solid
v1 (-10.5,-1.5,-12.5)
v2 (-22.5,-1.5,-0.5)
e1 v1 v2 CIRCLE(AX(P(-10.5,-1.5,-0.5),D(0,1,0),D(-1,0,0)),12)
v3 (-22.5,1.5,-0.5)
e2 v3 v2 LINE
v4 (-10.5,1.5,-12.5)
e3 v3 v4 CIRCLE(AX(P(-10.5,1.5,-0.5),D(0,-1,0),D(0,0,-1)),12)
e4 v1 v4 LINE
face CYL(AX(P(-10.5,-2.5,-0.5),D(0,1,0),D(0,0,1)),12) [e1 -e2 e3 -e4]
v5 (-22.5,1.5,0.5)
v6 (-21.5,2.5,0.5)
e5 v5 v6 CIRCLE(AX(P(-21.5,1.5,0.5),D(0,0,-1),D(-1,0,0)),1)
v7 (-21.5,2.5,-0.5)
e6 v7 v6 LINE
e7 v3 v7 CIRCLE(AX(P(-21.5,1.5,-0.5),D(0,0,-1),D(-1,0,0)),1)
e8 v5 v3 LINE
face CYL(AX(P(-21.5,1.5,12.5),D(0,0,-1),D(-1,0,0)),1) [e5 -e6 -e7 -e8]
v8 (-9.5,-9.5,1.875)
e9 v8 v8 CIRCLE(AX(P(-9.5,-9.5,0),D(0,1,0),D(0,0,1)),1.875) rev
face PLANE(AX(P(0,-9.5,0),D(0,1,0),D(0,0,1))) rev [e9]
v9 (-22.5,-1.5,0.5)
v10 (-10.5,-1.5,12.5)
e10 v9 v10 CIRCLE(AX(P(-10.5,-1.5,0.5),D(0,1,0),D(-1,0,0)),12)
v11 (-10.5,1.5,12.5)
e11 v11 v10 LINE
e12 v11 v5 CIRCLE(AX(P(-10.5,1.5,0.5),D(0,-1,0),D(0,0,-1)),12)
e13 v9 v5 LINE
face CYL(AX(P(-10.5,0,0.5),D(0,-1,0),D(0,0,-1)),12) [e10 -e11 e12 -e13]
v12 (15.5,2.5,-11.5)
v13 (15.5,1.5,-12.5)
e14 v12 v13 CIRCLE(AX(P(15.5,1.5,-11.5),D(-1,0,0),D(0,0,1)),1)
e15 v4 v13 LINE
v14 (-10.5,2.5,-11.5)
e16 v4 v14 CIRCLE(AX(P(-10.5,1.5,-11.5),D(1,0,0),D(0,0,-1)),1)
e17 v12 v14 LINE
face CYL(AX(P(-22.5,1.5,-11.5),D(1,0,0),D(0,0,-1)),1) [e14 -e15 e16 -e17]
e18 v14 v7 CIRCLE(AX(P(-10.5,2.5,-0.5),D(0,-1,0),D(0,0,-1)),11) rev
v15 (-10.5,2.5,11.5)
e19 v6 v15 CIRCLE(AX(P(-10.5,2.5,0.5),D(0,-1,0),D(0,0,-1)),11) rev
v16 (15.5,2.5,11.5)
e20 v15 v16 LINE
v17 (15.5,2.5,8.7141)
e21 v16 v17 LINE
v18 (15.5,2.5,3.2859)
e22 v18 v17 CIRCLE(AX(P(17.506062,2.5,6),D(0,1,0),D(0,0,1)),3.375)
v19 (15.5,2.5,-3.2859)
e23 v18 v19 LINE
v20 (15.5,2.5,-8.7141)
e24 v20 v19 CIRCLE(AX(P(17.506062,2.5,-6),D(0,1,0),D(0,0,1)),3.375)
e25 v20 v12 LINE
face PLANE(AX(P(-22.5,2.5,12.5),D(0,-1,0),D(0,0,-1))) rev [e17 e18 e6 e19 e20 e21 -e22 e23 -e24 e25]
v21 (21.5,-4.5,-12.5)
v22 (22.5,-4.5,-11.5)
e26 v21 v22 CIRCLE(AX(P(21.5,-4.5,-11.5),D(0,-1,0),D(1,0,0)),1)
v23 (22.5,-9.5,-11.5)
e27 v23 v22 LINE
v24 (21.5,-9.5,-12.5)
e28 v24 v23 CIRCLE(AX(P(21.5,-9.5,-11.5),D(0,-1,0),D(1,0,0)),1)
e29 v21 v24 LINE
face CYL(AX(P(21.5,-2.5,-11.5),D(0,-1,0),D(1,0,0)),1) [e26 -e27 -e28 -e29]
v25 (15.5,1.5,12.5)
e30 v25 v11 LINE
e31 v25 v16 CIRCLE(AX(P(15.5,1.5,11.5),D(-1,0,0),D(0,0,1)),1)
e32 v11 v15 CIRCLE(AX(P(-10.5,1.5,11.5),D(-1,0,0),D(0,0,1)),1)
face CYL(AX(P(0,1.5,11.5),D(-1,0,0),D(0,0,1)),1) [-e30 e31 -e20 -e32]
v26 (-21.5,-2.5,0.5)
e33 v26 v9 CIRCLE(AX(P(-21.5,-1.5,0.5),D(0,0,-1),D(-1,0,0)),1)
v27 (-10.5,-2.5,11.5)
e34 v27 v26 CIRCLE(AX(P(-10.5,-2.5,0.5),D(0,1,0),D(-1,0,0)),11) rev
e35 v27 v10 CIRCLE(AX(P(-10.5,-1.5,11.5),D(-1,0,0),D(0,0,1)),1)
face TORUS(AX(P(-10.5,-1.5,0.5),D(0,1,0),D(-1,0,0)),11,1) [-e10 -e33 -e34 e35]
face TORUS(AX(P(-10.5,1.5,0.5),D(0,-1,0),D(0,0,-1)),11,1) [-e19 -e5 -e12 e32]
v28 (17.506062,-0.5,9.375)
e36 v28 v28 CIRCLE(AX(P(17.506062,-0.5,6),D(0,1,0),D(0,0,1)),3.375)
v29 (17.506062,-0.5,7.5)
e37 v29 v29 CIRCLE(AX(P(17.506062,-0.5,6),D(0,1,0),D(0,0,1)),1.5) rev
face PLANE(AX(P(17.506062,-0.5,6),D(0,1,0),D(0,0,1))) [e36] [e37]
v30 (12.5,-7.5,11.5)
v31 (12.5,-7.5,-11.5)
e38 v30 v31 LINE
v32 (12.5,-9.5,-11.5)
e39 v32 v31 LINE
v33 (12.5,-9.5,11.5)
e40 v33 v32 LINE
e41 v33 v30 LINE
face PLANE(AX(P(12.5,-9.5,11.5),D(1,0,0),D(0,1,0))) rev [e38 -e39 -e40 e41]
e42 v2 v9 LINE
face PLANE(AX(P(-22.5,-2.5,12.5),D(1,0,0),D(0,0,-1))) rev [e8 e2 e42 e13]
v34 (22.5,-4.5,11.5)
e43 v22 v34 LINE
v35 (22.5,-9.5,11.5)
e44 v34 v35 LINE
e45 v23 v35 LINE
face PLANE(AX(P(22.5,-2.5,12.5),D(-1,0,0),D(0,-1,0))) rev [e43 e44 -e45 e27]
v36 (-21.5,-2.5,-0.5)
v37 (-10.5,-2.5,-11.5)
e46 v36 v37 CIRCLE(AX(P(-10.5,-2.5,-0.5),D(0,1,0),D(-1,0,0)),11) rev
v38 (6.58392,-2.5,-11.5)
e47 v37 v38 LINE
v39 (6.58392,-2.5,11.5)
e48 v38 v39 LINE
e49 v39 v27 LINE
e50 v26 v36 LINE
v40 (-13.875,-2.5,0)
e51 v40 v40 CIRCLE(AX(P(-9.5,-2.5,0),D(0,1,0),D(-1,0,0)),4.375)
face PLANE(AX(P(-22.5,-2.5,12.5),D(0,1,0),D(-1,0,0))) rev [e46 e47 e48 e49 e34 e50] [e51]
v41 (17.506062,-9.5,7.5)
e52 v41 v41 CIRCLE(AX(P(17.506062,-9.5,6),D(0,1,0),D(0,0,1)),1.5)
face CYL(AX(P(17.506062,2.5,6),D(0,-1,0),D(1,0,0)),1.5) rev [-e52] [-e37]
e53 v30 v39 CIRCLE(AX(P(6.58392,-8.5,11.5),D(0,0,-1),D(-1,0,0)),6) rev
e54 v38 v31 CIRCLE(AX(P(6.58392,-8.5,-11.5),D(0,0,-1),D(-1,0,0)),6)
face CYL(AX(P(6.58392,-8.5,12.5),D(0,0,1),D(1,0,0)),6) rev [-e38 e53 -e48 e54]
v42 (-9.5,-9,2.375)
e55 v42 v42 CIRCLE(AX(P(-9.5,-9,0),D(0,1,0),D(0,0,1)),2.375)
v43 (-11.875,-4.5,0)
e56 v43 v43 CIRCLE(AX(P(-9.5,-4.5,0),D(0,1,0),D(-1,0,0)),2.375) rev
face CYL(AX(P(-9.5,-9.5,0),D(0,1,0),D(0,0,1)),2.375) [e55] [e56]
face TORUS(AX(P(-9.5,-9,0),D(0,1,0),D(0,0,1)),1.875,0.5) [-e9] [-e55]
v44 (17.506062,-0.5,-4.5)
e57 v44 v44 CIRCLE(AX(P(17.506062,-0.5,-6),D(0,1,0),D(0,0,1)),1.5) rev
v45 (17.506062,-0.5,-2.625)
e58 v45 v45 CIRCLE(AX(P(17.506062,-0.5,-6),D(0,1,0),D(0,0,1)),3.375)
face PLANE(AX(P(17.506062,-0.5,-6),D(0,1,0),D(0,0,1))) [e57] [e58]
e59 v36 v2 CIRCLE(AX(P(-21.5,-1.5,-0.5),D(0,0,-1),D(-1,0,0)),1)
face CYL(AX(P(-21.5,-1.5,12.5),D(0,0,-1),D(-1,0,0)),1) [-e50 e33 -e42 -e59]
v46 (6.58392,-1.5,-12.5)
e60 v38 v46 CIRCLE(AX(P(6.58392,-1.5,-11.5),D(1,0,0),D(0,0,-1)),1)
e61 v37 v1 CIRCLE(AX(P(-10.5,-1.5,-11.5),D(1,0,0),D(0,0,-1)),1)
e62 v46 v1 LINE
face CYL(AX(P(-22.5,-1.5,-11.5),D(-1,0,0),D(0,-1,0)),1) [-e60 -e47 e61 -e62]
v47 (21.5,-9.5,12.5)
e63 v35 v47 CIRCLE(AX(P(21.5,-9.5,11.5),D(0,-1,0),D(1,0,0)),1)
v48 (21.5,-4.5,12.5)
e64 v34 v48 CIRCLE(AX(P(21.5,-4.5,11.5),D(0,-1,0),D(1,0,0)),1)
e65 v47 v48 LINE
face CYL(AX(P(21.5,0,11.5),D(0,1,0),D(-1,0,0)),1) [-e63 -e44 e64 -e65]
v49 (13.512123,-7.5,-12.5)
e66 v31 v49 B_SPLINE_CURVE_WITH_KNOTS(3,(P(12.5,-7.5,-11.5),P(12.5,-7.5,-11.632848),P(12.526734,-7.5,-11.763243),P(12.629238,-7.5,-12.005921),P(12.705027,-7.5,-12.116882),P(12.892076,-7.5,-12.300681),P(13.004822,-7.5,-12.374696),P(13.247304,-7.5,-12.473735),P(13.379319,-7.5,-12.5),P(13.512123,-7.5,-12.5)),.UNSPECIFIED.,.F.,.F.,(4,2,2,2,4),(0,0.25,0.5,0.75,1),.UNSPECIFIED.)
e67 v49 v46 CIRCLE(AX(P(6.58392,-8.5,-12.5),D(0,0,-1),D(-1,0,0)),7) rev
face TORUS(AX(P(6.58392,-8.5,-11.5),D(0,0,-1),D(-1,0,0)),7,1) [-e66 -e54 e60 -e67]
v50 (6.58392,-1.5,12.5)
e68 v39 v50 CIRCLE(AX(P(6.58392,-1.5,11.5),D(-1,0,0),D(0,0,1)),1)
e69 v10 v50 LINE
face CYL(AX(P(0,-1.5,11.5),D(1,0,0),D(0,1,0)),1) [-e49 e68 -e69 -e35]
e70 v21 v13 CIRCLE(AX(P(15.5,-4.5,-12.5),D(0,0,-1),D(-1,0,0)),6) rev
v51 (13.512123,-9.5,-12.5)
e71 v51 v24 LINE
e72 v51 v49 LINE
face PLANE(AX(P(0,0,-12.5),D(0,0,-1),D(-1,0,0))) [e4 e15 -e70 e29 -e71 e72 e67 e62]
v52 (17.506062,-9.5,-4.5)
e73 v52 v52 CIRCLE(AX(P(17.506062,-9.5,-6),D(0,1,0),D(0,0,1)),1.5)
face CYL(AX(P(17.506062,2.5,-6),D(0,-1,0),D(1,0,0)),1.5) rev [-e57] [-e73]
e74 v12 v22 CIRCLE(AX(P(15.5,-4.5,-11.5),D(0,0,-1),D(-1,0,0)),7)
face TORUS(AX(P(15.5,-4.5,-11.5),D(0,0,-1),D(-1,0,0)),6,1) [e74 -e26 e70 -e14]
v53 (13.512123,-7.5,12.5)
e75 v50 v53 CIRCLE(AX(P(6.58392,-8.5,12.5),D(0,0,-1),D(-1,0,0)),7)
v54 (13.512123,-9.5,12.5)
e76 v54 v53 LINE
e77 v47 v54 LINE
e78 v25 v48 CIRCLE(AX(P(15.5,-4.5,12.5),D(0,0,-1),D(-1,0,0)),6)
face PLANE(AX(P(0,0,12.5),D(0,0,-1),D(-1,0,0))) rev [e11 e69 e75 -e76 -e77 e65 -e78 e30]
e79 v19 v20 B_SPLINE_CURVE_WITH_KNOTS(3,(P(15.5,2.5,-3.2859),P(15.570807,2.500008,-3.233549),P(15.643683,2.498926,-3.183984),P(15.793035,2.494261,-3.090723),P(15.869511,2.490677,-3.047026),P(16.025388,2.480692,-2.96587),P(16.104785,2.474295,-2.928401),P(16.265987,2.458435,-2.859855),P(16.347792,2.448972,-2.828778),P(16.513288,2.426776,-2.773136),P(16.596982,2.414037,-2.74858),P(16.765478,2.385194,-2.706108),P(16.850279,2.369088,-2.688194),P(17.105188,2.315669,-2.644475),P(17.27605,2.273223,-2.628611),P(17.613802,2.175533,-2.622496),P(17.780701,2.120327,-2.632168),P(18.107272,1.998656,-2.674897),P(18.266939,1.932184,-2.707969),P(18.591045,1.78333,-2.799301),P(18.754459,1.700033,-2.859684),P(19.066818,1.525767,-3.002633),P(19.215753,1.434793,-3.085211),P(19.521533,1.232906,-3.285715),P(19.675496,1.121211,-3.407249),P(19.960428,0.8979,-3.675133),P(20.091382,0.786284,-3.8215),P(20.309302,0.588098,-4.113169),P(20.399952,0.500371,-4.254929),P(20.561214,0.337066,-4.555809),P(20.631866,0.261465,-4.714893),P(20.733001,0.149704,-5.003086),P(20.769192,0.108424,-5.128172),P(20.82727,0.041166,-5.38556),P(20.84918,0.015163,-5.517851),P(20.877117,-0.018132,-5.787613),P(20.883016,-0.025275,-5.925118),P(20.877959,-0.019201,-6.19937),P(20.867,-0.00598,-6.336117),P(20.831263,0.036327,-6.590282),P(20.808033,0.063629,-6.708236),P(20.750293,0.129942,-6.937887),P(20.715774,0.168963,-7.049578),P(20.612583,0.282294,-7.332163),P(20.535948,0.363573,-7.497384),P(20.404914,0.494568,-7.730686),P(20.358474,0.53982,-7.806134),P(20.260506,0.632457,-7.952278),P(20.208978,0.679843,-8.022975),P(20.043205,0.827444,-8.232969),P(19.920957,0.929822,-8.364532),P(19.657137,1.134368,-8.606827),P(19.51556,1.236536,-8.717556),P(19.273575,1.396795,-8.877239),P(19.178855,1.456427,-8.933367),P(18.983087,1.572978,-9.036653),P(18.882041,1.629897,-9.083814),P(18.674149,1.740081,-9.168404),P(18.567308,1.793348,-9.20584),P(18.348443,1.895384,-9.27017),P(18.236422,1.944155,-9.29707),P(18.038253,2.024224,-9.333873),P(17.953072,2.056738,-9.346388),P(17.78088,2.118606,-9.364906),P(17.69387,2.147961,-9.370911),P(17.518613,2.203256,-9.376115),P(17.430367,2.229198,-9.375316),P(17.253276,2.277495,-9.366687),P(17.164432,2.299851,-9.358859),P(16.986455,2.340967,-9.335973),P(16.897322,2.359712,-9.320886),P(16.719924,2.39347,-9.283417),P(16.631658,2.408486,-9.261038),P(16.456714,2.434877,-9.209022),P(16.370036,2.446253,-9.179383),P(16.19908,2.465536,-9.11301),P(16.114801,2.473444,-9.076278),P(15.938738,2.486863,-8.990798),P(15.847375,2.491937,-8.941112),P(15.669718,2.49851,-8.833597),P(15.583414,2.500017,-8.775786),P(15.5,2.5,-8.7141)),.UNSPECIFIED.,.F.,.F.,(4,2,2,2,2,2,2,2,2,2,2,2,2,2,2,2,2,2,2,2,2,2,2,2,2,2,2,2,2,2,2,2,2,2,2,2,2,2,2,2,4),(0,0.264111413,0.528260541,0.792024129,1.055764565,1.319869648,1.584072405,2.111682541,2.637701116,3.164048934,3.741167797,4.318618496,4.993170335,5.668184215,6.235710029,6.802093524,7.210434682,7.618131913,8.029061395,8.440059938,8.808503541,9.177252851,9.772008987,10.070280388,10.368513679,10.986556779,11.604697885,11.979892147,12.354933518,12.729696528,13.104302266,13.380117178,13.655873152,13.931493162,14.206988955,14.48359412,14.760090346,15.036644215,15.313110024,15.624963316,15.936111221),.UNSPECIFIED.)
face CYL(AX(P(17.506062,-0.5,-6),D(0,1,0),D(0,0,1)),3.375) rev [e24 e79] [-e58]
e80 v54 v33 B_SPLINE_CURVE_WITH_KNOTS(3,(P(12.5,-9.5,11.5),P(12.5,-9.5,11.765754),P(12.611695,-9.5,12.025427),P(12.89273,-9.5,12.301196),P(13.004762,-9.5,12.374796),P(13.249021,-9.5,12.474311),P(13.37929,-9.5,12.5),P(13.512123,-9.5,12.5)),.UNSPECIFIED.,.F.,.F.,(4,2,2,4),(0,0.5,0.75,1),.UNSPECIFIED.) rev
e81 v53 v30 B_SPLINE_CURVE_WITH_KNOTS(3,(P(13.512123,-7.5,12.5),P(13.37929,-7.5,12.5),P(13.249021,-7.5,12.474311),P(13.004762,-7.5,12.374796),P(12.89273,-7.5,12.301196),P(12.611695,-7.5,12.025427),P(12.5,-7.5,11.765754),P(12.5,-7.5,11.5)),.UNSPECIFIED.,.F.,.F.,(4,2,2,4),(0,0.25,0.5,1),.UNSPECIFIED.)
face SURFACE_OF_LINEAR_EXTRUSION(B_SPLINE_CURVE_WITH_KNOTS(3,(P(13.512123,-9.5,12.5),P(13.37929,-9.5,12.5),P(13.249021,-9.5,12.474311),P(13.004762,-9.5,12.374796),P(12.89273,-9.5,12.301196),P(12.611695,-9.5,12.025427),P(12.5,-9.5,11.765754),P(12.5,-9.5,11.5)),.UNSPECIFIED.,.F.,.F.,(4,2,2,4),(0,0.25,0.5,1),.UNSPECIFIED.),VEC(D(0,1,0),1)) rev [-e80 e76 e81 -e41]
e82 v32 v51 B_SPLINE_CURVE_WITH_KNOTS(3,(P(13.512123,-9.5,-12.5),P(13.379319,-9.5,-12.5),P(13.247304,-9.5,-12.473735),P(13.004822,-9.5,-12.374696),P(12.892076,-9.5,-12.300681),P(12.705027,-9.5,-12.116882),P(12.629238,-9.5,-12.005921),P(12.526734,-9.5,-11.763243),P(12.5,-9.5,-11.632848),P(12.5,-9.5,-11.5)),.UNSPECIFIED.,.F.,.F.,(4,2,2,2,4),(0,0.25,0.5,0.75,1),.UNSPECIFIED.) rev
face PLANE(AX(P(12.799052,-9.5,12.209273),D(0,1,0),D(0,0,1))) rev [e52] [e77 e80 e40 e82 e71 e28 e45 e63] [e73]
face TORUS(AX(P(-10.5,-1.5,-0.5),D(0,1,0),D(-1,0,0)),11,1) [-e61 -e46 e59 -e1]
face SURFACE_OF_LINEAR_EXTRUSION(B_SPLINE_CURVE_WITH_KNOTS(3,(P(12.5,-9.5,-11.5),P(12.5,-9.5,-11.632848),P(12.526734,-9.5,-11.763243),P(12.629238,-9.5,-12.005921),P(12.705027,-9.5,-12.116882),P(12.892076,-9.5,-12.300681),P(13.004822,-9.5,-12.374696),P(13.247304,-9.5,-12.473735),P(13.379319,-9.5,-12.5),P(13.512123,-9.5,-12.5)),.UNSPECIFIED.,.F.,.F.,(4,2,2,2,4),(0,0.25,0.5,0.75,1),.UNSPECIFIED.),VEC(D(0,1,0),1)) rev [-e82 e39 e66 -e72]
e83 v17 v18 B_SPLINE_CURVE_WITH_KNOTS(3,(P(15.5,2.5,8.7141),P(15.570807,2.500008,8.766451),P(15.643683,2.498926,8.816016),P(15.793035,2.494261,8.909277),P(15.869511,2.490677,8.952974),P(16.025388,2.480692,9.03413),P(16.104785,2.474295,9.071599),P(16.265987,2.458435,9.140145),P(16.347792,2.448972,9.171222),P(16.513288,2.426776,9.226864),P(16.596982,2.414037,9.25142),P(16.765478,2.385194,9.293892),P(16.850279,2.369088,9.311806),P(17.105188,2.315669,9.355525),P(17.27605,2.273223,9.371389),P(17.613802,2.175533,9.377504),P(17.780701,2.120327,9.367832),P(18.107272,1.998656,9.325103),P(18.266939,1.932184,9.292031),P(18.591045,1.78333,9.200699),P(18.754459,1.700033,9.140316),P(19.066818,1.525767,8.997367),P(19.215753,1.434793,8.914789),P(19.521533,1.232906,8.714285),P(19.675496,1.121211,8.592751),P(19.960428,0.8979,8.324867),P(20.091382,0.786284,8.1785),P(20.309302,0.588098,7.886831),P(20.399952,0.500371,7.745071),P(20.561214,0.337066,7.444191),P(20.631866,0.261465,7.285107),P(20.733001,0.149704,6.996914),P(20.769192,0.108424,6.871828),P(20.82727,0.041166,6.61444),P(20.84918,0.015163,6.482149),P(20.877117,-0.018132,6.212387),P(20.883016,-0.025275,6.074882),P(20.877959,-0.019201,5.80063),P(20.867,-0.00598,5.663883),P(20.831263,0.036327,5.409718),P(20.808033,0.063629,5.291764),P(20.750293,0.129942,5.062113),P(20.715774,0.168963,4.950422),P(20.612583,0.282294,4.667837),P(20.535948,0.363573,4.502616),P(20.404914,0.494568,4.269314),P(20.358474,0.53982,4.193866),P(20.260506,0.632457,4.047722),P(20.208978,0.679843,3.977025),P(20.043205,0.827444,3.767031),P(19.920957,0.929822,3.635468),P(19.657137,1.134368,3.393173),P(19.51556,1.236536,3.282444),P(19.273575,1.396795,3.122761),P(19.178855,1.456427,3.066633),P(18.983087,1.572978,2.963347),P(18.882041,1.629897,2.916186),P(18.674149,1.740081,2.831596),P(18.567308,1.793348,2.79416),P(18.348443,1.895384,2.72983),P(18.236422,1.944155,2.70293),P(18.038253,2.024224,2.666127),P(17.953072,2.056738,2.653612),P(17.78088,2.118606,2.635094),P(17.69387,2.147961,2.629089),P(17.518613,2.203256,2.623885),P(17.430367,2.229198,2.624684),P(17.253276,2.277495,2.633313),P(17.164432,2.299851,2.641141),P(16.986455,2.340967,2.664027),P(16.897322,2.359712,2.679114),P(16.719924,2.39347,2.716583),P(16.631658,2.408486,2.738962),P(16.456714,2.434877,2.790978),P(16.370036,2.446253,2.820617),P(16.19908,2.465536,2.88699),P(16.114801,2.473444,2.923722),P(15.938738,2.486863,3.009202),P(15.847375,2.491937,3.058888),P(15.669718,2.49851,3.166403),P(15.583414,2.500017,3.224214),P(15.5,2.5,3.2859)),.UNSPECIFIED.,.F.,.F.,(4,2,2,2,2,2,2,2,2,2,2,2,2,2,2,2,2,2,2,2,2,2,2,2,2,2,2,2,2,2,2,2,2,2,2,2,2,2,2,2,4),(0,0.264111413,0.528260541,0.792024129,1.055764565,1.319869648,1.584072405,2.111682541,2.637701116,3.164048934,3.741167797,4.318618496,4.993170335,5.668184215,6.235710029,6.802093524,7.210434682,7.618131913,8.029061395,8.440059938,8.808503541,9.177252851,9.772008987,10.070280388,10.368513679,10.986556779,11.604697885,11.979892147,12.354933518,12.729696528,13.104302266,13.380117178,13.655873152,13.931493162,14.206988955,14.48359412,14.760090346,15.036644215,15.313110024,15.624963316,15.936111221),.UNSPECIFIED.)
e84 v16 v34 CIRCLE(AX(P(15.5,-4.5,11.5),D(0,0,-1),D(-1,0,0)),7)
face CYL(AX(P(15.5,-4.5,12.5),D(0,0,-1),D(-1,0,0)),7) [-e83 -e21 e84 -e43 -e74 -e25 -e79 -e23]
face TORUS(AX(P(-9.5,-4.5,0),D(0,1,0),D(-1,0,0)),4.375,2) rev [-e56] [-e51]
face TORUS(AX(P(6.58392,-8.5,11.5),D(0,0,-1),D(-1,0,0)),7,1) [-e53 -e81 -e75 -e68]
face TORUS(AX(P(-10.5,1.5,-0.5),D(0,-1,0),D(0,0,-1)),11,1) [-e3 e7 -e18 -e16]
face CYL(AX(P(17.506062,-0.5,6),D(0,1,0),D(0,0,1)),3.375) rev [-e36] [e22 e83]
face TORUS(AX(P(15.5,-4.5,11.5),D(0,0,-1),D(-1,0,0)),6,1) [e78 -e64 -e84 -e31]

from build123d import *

# Parameters (mm, degrees)
SALIENTE_EXTRUIR1_DEPTH    = 12.5
REDONDEO1_R                = 12
REDONDEO2_R                = 6
REDONDEO3_R                = 1
CROQUIS4_R                 = 2.375
SALIENTE_EXTRUIR3_DEPTH    = 12
REDONDEO4_R                = 0.5
REDONDEO5_R                = 2
SALIENTE_EXTRUIR4_DEPTH    = 2
CORTAR_EXTRUIR1_DEPTH      = 28.61340267
CORTAR_EXTRUIR1_DEPTH_BACK = 28.61340267
REDONDEO6_R                = 7
CROQUIS8_R                 = 3.375
CORTAR_EXTRUIR2_DEPTH      = 3


with BuildPart() as part:
    # Croquis2 → Saliente-Extruir1 (new, symmetric)
    with BuildSketch(Plane.XY):
        Polygon((-22.5, -2.5), (12.5, -2.5), (12.5, -7.5), (22.5, -7.5), (22.5, -2.5), (22.5, 2.5), (-22.5, 2.5), align=None)
    extrude(amount=SALIENTE_EXTRUIR1_DEPTH, both=True)

    # Redondeo1
    redondeo1_edges = [part.edges().sort_by_distance(p)[0] for p in [
        (-22.5, 0, 12.5),
        (-22.5, 0, -12.5),
    ]]
    fillet(redondeo1_edges, radius=REDONDEO1_R)

    # Redondeo2
    # the kernel refuses this fillet: 6 mm, written as the material it adds along each edge
    with BuildSketch(Plane(origin=(12.5, -2.5, -12.5), x_dir=(-1, 0, 0), z_dir=(0, 0, 1))) as redondeo2_piece_1:
        with BuildLine():
            CenterArc((5.916079783, 6), REDONDEO2_R, 189.594068227, 80.405931773)
            Line((0, 5), (-0.118321596, 4.98))
            ThreePointArc((-0.118321596, 4.98), (-0.12, 2.5), (-0.12, 0))
            Line((-0.12, 0), (0, -0.12))
            Line((0, -0.12), (5.916079783, -0.12))
            Line((5.916079783, -0.12), (5.916079783, 0))
        make_face()
    extrude(amount=25)

    # Redondeo3
    redondeo3_edges = [part.edges().sort_by_distance(p)[0] for p in [
        (-22.5, -2.5, 0),
        (-22.5, 2.5, 0),
        (-1.958039892, -2.5, -12.5),
        (-1.958039892, -2.5, 12.5),
        (-18.985281374, -2.5, 8.985281374),
        (-18.985281374, -2.5, -8.985281374),
        (-18.985281374, 2.5, 8.985281374),
        (-18.985281374, 2.5, -8.985281374),
        (10.456903563, -3.917424305, -12.5),
        (10.456903563, -3.917424305, 12.5),
        (22.5, -2.5, 12.5),
        (22.5, -2.5, -12.5),
        (6, 2.5, 12.5),
        (6, 2.5, -12.5),
    ]]
    fillet(redondeo3_edges, radius=REDONDEO3_R)

    # Croquis4 → Saliente-Extruir3 (add)
    with BuildSketch(Plane(origin=(0, 2.5, 0), x_dir=(1, 0, 0), z_dir=(0, 1, 0))):
        with Locations(Location((-9.5, 0, 0), (0, 0, 270))):
            Circle(CROQUIS4_R)
    extrude(amount=-SALIENTE_EXTRUIR3_DEPTH)

    # Redondeo4
    redondeo4_edges = [part.edges().sort_by_distance(p)[0] for p in [
        (-9.5, -9.5, -2.375),
    ]]
    fillet(redondeo4_edges, radius=REDONDEO4_R)

    # Redondeo5
    redondeo5_edges = [part.edges().sort_by_distance(p)[0] for p in [
        (-9.5, -2.5, -2.375),
    ]]
    fillet(redondeo5_edges, radius=REDONDEO5_R)

    # Croquis7 → Saliente-Extruir4 (add)
    with BuildSketch(Plane.XZ.offset(7.5)):
        with BuildLine():
            Line((12.5, 11.5), (12.5, -11.5))
            add(Edge.make_bspline(
                [(12.5, -11.5), (12.5, -11.632848265), (12.526734482, -11.763242783), (12.62923764, -12.005921342), (12.70502711, -12.11688233), (12.892075524, -12.300681325), (13.00482188, -12.374695974), (13.247304361, -12.47373544), (13.379319354, -12.5), (13.512123447, -12.5)],
                knots=[0, 0, 0, 0, 0.25, 0.25, 0.5, 0.5, 0.75, 0.75, 1, 1, 1, 1], degree=3))
            Line((13.512123447, -12.5), (21.5, -12.5))
            ThreePointArc((21.5, -12.5), (22.207106781, -12.207106781), (22.5, -11.5))
            Line((22.5, -11.5), (22.5, 11.5))
            ThreePointArc((22.5, 11.5), (22.207106781, 12.207106781), (21.5, 12.5))
            Line((21.5, 12.5), (13.512123447, 12.5))
            add(Edge.make_bspline(
                [(13.512123447, 12.5), (13.379290266, 12.5), (13.249021118, 12.474311205), (13.004761707, 12.374795975), (12.892729967, 12.301196052), (12.611695188, 12.025427443), (12.5, 11.765753932), (12.5, 11.5)],
                knots=[0, 0, 0, 0, 0.25, 0.25, 0.5, 0.5, 1, 1, 1, 1], degree=3))
        make_face()
    extrude(amount=SALIENTE_EXTRUIR4_DEPTH)

    # Croquis6 → Cortar-Extruir1 (cut, two sides: drawn at the far end of the back side and taken through both)
    with BuildSketch(Plane.XZ.offset(7.5).offset(-CORTAR_EXTRUIR1_DEPTH_BACK)):
        with BuildLine():
            ThreePointArc((19.006061724, 6), (18.566721895, 7.060660172), (17.506061724, 7.5))
            Line((17.506061724, 7.5), (17.506061724, 4.5))
            ThreePointArc((17.506061724, 4.5), (18.566721895, 4.939339828), (19.006061724, 6))
        make_face()
        with BuildLine():
            Line((17.506061724, 4.5), (17.506061724, 7.5))
            ThreePointArc((17.506061724, 7.5), (16.006061724, 6), (17.506061724, 4.5))
        make_face()
        with BuildLine():
            ThreePointArc((19.006061724, -6), (18.566721895, -4.939339828), (17.506061724, -4.5))
            Line((17.506061724, -4.5), (17.506061724, -7.5))
            ThreePointArc((17.506061724, -7.5), (18.566721895, -7.060660172), (19.006061724, -6))
        make_face()
        with BuildLine():
            Line((17.506061724, -7.5), (17.506061724, -4.5))
            ThreePointArc((17.506061724, -4.5), (16.006061724, -6), (17.506061724, -7.5))
        make_face()
    extrude(amount=CORTAR_EXTRUIR1_DEPTH + CORTAR_EXTRUIR1_DEPTH_BACK, mode=Mode.SUBTRACT)

    # Redondeo6
    # the kernel refuses this fillet: 7 mm, written as the material it takes off along each edge
    with BuildSketch(Plane(origin=(15.5, -4.5, 12.5), x_dir=(1, 0, 0), z_dir=(0, -1, 0))) as redondeo6_piece_1:
        with BuildLine():
            CenterArc((6, -1), 1, 0, 90)
            Line((7, -1), (7, 0))
            Line((7, 0), (6, 0))
        make_face()
    revolve(axis=Axis((15.5, -4.5, 12.5), (0, 0, 1)), revolution_arc=90, mode=Mode.SUBTRACT)
    with BuildSketch(Plane(origin=(15.5, -4.5, -12.5), x_dir=(0, 1, 0), z_dir=(-1, 0, 0))) as redondeo6_piece_2:
        with BuildLine():
            CenterArc((6, -1), 1, 0, 90)
            Line((7, -1), (7, 0))
            Line((7, 0), (6, 0))
        make_face()
    revolve(axis=Axis((15.5, -4.5, -12.5), (0, 0, -1)), revolution_arc=90, mode=Mode.SUBTRACT)
    with BuildSketch(Plane(origin=(22.5, 2.5, 12.5), x_dir=(0, -1, 0), z_dir=(0, 0, -1))) as redondeo6_piece_3:
        with BuildLine():
            CenterArc((REDONDEO6_R, REDONDEO6_R), REDONDEO6_R, 180, 90)
            Line((0, REDONDEO6_R), (0, 0))
            Line((0, 0), (REDONDEO6_R, 0))
        make_face()
    extrude(amount=25, mode=Mode.SUBTRACT)

    # Croquis8 → Cortar-Extruir2 (cut)
    with BuildSketch(Plane(origin=(0, 2.5, 0), x_dir=(1, 0, 0), z_dir=(0, 1, 0))):
        with Locations(Location((17.506061724, -6, 0), (0, 0, 270))):
            Circle(CROQUIS8_R)
        with Locations(Location((17.506061724, 6, 0), (0, 0, 270))):
            Circle(CROQUIS8_R)
    extrude(amount=-CORTAR_EXTRUIR2_DEPTH, mode=Mode.SUBTRACT)


solid = part.part
